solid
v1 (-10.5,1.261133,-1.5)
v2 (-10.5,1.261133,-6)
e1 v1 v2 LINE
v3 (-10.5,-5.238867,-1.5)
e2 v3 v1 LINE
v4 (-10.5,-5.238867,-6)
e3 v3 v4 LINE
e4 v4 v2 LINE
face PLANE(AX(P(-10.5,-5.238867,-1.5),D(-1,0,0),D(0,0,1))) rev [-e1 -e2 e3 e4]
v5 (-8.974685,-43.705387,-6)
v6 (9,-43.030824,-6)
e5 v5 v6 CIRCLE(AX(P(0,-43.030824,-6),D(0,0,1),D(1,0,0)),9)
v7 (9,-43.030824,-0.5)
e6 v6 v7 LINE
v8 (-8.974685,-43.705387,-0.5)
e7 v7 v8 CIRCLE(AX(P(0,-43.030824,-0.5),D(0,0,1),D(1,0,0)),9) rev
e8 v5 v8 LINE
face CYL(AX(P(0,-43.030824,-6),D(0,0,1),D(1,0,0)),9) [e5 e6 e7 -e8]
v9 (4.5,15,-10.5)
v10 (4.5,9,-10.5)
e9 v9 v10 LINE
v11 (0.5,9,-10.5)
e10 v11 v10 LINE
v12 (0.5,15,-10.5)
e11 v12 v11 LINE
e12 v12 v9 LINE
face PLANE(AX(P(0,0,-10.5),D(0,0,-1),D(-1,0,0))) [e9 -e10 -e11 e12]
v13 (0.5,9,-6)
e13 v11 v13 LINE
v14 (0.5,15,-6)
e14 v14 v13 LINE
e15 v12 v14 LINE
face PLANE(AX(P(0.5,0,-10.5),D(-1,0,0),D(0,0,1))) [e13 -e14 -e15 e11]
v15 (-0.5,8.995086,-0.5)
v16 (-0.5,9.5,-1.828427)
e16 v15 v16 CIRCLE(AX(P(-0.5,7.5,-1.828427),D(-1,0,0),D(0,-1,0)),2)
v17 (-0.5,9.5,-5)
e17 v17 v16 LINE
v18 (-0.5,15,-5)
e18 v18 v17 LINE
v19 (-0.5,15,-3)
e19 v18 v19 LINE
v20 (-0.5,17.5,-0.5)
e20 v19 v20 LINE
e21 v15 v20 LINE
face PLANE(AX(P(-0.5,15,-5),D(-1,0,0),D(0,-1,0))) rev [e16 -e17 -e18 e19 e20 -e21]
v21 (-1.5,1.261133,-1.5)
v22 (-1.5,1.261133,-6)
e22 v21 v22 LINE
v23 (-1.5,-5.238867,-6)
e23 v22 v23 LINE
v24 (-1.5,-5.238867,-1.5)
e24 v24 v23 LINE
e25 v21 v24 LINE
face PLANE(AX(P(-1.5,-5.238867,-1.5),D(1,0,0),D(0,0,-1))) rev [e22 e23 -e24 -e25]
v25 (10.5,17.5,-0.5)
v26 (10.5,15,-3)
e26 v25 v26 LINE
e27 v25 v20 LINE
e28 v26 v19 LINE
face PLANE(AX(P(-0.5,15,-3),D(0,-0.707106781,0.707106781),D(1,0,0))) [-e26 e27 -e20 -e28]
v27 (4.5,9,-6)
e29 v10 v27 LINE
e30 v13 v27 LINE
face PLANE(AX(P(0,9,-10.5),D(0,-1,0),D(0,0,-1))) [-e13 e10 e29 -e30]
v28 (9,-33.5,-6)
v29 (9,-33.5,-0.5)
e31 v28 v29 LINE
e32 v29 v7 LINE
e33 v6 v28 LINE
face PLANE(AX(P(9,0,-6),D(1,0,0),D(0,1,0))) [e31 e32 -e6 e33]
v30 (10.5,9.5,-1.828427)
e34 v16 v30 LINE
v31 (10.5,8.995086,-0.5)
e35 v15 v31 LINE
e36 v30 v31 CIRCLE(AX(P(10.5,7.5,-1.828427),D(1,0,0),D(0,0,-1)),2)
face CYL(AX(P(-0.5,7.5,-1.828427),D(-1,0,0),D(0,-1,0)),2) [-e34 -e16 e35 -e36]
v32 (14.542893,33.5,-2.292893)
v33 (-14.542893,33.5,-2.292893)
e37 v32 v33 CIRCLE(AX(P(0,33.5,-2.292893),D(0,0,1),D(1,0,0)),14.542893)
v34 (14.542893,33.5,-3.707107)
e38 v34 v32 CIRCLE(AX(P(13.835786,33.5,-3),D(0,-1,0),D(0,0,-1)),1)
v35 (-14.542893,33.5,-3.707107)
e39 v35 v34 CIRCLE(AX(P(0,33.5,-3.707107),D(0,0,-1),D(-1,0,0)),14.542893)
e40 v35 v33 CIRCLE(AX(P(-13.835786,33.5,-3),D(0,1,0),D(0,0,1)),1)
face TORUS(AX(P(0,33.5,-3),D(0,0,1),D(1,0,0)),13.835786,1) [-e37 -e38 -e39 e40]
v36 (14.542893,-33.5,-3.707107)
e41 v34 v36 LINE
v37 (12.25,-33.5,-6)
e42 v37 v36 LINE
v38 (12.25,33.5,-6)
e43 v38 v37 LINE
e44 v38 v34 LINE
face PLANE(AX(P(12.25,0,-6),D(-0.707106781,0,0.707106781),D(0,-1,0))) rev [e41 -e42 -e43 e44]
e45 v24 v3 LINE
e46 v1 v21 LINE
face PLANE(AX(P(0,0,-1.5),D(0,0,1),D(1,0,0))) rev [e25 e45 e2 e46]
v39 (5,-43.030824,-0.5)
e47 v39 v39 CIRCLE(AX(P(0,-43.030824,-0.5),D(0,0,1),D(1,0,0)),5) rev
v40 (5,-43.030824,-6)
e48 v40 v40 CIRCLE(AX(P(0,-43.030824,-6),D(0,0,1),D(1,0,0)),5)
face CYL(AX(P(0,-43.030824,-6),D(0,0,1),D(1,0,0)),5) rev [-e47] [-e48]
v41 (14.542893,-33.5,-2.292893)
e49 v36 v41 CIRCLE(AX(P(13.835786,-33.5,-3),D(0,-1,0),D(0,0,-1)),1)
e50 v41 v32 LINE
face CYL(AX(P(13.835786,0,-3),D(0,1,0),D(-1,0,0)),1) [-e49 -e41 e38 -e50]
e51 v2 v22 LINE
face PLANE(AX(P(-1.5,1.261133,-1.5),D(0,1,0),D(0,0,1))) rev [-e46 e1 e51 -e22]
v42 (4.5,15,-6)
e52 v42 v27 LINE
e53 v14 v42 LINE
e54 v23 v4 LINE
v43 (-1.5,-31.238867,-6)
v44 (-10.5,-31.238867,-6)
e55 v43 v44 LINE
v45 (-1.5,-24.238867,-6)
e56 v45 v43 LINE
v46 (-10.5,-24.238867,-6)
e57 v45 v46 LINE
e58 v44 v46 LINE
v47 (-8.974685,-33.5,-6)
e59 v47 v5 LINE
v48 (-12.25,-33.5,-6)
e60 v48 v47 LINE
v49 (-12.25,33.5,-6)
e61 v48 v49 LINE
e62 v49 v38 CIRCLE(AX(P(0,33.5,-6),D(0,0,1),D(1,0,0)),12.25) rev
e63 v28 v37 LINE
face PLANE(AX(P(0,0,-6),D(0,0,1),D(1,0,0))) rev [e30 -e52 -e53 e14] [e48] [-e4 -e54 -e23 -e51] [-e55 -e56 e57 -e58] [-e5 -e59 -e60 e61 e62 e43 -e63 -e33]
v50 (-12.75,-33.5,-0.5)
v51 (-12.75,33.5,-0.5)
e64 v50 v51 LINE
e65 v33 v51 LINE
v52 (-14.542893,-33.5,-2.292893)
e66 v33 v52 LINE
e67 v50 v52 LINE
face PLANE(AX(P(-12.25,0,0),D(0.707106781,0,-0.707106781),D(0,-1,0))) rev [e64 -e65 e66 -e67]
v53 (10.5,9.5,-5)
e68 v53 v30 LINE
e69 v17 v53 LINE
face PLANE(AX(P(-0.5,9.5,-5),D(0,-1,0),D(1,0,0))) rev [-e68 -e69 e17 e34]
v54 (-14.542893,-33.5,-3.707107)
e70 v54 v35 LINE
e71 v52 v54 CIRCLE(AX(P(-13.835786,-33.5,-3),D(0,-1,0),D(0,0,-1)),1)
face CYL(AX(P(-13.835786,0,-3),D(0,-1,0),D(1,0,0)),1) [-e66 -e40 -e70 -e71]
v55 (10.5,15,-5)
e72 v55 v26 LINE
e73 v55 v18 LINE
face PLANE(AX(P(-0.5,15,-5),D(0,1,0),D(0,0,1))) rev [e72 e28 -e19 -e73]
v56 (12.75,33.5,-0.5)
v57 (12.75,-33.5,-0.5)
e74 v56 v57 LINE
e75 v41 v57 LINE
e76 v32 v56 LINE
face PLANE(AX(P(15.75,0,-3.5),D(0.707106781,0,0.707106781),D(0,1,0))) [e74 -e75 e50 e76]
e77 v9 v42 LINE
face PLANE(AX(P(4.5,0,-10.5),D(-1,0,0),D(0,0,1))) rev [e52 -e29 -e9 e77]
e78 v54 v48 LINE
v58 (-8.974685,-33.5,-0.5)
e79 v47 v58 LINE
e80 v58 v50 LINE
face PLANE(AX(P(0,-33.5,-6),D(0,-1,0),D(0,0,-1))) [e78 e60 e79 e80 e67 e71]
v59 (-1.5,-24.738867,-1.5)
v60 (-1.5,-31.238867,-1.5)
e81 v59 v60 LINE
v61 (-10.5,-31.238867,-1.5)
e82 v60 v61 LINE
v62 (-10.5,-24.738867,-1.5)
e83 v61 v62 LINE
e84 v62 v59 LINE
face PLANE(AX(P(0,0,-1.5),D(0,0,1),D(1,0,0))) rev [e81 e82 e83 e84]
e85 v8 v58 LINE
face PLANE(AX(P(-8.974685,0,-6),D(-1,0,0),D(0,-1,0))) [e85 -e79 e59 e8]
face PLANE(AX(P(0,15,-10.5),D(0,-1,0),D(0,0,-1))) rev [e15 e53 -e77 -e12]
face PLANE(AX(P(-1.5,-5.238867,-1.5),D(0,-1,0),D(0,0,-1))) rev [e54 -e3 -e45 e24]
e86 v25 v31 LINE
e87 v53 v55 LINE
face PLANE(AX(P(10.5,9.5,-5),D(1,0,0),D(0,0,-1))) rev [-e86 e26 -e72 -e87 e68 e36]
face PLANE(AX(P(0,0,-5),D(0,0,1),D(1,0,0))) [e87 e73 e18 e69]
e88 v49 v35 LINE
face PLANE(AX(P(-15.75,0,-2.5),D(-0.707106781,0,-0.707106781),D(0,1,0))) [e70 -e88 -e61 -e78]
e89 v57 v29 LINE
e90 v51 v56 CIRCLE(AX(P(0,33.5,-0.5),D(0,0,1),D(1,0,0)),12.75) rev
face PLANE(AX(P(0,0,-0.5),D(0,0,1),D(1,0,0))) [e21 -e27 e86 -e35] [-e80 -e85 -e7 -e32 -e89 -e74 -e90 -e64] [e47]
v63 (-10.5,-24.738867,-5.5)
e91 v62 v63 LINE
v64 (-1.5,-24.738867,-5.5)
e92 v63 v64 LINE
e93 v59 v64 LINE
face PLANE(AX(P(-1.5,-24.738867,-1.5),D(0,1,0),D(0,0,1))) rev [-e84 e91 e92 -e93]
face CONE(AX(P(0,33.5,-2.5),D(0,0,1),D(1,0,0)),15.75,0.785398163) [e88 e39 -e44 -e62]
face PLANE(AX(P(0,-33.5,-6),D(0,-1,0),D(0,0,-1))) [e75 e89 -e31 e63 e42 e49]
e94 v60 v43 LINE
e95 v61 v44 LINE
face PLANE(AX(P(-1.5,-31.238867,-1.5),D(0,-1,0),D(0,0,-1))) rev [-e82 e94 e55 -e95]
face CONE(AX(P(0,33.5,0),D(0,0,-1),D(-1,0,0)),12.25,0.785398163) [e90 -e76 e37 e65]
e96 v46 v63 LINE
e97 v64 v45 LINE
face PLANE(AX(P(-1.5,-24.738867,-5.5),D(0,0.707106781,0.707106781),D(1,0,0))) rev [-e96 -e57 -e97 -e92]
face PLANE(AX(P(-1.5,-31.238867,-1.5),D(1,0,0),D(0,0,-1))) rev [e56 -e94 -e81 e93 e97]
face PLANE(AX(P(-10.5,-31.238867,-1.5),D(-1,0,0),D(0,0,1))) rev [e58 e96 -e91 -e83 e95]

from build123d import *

# Parameters (mm, degrees)
DODANIE_WYCI_GNI_CIE1_DEPTH = 6
SFAZOWANIE1_SIZE            = 3.5
ZAOKR_GLENIE1_R             = 1
SZKIC2_W                    = 11
SZKIC2_H                    = 5.5
WYTNIJ_WYCI_GNI_CIE1_DEPTH  = 5
SZKIC3_W                    = 9
SZKIC3_H                    = 6.5
WYTNIJ_WYCI_GNI_CIE2_DEPTH  = 4.5
SFAZOWANIE2_SIZE            = 0.5
SZKIC4_R                    = 5
DODANIE_WYCI_GNI_CIE2_DEPTH = 6
SZKIC5_W                    = 4
SZKIC5_H                    = 6
DODANIE_WYCI_GNI_CIE3_DEPTH = 4.5
SFAZOWANIE3_SIZE            = 3
SFAZOWANIE4_SIZE            = 1
ZAOKR_GLENIE2_R             = 2
SZKIC6_W                    = 43.68114346
SZKIC6_H                    = 110.382920914
WYTNIJ_WYCI_GNI_CIE3_DEPTH  = 0.5


with BuildPart() as part:
    # Szkic1 → Dodanie-wyciągnięcie1 (new body)
    with BuildSketch(Plane.XY):
        with BuildLine():
            ThreePointArc((15.75, 33.5), (0, 49.25), (-15.75, 33.5))
            Line((-15.75, 33.5), (15.75, 33.5))
        make_face()
        with BuildLine():
            Line((15.75, 33.5), (-15.75, 33.5))
            ThreePointArc((-15.75, 33.5), (0, 17.75), (15.75, 33.5))
        make_face()
        with BuildLine():
            ThreePointArc((15.75, 33.5), (0, 17.75), (-15.75, 33.5))
            Line((-15.75, 33.5), (-15.75, -33.5))
            Line((-15.75, -33.5), (15.75, -33.5))
            Line((15.75, -33.5), (15.75, 33.5))
        make_face()
    extrude(amount=-DODANIE_WYCI_GNI_CIE1_DEPTH)

    # Sfazowanie1
    # the kernel refuses this chamfer: 3.5 mm, written as the material it takes off along each edge
    with BuildSketch(Plane(origin=(15.75, -42.500890458, 0), x_dir=(-0.9996219169112968, 0, 0.02749587661058637), z_dir=(0, 1, 0)), Plane(origin=(-15.75, 33.5, 0), x_dir=(0.9996219169112968, 0, 0.02749587661058637), z_dir=(0, -1, 0)), Plane(origin=(-15.75, 33.5, -6), x_dir=(-0.02749587661058661, 0, 0.9996219169112968), z_dir=(0, -1, 0))) as sfazowanie1_piece_1:
        Polygon((SFAZOWANIE1_SIZE * 0.999621916911, -SFAZOWANIE1_SIZE * 0.0274958766106), (-SFAZOWANIE1_SIZE * 0.0274958766106, -SFAZOWANIE1_SIZE * 0.999621916911), (0, 0), align=None)
    extrude(amount=76.000890458, mode=Mode.SUBTRACT)
    with BuildSketch(Plane(origin=(15.75, -42.500890458, -6), x_dir=(-0.9996219169112968, 0, -0.027495876610586358), z_dir=(0, 1, 0))) as sfazowanie1_piece_2:
        Polygon((SFAZOWANIE1_SIZE * 0.999621916911, SFAZOWANIE1_SIZE * 0.0274958766106), (-SFAZOWANIE1_SIZE * 0.0274958766106, SFAZOWANIE1_SIZE * 0.999621916911), (0, 0), align=None)
    extrude(amount=76.000890458, mode=Mode.SUBTRACT)
    with BuildSketch(Plane(origin=(0, 33.5, 0), x_dir=(-1, 0, 0), z_dir=(0, -1, 0))) as sfazowanie1_piece_3:
        Polygon((15.75, SFAZOWANIE1_SIZE), (15.75 - SFAZOWANIE1_SIZE, 0), (15.75, 0), align=None)
    revolve(axis=Axis((0, 33.5, 0), (0, 0, -1)), revolution_arc=180, mode=Mode.SUBTRACT)
    with BuildSketch(Plane(origin=(0, 33.5, -6), x_dir=(1, 0, 0), z_dir=(0, -1, 0))) as sfazowanie1_piece_4:
        Polygon((15.75, SFAZOWANIE1_SIZE), (15.75 - SFAZOWANIE1_SIZE, 0), (15.75, 0), align=None)
    revolve(axis=Axis((0, 33.5, -6), (0, 0, 1)), revolution_arc=180, mode=Mode.SUBTRACT)

    # Zaokrąglenie1
    zaokr_glenie1_edges = [part.edges().sort_by_distance(p)[0] for p in [
        (-15.25, 0, -3),
        (0, 48.75, -3),
        (15.25, 0, -3),
    ]]
    fillet(zaokr_glenie1_edges, radius=ZAOKR_GLENIE1_R)

    # Szkic2 → Wytnij-wyciągnięcie1 (cut)
    with BuildSketch(Plane.XY):
        with Locations((5, 12.25)):
            Rectangle(SZKIC2_W, SZKIC2_H)
    extrude(amount=-WYTNIJ_WYCI_GNI_CIE1_DEPTH, mode=Mode.SUBTRACT)

    # Szkic3 → Wytnij-wyciągnięcie2 (cut)
    with BuildSketch(Plane(origin=(0, 0, -6), x_dir=(-1, 0, 0), z_dir=(0, 0, -1))):
        with Locations((6, -1.988867336)):
            Rectangle(SZKIC3_W, SZKIC3_H)
        with Locations((6, -27.988867336)):
            Rectangle(SZKIC3_W, SZKIC3_H)
    extrude(amount=-WYTNIJ_WYCI_GNI_CIE2_DEPTH, mode=Mode.SUBTRACT)

    # Sfazowanie2
    sfazowanie2_edges = [part.edges().sort_by_distance(p)[0] for p in [
        (-6, -24.738867336, -6),
    ]]
    chamfer(sfazowanie2_edges, length=SFAZOWANIE2_SIZE)

    # Szkic4 → Dodanie-wyciągnięcie2 (add)
    with BuildSketch(Plane.XY):
        with BuildLine():
            Line((9, -33.5), (-8.974684649, -33.5))
            Line((-8.974684649, -33.5), (-8.974684649, -43.705386779))
            ThreePointArc((-8.974684649, -43.705386779), (0.337519003, -52.024492564), (9, -43.030823629))
            Line((9, -43.030823629), (9, -33.5))
        make_face()
        with Locations((0, -43.030823629)):
            Circle(SZKIC4_R, mode=Mode.SUBTRACT)
    extrude(amount=-DODANIE_WYCI_GNI_CIE2_DEPTH)

    # Szkic5 → Dodanie-wyciągnięcie3 (add)
    with BuildSketch(Plane(origin=(0, 0, -6), x_dir=(-1, 0, 0), z_dir=(0, 0, -1))):
        with Locations((-2.5, 12)):
            Rectangle(SZKIC5_W, SZKIC5_H)
    extrude(amount=DODANIE_WYCI_GNI_CIE3_DEPTH)

    # Sfazowanie3
    sfazowanie3_edges = [part.edges().sort_by_distance(p)[0] for p in [
        (5, 15, 0),
    ]]
    chamfer(sfazowanie3_edges, length=SFAZOWANIE3_SIZE)

    # Sfazowanie4
    sfazowanie4_edges = [part.edges().sort_by_distance(p)[0] for p in [
        (5, 9.5, 0),
    ]]
    chamfer(sfazowanie4_edges, length=SFAZOWANIE4_SIZE)

    # Zaokrąglenie2
    zaokr_glenie2_edges = [part.edges().sort_by_distance(p)[0] for p in [
        (5, 9.5, -1),
    ]]
    fillet(zaokr_glenie2_edges, radius=ZAOKR_GLENIE2_R)

    # Szkic6 → Wytnij-wyciągnięcie3 (cut)
    with BuildSketch(Plane.XY):
        Rectangle(SZKIC6_W, SZKIC6_H)
    extrude(amount=-WYTNIJ_WYCI_GNI_CIE3_DEPTH, mode=Mode.SUBTRACT)


solid = part.part
